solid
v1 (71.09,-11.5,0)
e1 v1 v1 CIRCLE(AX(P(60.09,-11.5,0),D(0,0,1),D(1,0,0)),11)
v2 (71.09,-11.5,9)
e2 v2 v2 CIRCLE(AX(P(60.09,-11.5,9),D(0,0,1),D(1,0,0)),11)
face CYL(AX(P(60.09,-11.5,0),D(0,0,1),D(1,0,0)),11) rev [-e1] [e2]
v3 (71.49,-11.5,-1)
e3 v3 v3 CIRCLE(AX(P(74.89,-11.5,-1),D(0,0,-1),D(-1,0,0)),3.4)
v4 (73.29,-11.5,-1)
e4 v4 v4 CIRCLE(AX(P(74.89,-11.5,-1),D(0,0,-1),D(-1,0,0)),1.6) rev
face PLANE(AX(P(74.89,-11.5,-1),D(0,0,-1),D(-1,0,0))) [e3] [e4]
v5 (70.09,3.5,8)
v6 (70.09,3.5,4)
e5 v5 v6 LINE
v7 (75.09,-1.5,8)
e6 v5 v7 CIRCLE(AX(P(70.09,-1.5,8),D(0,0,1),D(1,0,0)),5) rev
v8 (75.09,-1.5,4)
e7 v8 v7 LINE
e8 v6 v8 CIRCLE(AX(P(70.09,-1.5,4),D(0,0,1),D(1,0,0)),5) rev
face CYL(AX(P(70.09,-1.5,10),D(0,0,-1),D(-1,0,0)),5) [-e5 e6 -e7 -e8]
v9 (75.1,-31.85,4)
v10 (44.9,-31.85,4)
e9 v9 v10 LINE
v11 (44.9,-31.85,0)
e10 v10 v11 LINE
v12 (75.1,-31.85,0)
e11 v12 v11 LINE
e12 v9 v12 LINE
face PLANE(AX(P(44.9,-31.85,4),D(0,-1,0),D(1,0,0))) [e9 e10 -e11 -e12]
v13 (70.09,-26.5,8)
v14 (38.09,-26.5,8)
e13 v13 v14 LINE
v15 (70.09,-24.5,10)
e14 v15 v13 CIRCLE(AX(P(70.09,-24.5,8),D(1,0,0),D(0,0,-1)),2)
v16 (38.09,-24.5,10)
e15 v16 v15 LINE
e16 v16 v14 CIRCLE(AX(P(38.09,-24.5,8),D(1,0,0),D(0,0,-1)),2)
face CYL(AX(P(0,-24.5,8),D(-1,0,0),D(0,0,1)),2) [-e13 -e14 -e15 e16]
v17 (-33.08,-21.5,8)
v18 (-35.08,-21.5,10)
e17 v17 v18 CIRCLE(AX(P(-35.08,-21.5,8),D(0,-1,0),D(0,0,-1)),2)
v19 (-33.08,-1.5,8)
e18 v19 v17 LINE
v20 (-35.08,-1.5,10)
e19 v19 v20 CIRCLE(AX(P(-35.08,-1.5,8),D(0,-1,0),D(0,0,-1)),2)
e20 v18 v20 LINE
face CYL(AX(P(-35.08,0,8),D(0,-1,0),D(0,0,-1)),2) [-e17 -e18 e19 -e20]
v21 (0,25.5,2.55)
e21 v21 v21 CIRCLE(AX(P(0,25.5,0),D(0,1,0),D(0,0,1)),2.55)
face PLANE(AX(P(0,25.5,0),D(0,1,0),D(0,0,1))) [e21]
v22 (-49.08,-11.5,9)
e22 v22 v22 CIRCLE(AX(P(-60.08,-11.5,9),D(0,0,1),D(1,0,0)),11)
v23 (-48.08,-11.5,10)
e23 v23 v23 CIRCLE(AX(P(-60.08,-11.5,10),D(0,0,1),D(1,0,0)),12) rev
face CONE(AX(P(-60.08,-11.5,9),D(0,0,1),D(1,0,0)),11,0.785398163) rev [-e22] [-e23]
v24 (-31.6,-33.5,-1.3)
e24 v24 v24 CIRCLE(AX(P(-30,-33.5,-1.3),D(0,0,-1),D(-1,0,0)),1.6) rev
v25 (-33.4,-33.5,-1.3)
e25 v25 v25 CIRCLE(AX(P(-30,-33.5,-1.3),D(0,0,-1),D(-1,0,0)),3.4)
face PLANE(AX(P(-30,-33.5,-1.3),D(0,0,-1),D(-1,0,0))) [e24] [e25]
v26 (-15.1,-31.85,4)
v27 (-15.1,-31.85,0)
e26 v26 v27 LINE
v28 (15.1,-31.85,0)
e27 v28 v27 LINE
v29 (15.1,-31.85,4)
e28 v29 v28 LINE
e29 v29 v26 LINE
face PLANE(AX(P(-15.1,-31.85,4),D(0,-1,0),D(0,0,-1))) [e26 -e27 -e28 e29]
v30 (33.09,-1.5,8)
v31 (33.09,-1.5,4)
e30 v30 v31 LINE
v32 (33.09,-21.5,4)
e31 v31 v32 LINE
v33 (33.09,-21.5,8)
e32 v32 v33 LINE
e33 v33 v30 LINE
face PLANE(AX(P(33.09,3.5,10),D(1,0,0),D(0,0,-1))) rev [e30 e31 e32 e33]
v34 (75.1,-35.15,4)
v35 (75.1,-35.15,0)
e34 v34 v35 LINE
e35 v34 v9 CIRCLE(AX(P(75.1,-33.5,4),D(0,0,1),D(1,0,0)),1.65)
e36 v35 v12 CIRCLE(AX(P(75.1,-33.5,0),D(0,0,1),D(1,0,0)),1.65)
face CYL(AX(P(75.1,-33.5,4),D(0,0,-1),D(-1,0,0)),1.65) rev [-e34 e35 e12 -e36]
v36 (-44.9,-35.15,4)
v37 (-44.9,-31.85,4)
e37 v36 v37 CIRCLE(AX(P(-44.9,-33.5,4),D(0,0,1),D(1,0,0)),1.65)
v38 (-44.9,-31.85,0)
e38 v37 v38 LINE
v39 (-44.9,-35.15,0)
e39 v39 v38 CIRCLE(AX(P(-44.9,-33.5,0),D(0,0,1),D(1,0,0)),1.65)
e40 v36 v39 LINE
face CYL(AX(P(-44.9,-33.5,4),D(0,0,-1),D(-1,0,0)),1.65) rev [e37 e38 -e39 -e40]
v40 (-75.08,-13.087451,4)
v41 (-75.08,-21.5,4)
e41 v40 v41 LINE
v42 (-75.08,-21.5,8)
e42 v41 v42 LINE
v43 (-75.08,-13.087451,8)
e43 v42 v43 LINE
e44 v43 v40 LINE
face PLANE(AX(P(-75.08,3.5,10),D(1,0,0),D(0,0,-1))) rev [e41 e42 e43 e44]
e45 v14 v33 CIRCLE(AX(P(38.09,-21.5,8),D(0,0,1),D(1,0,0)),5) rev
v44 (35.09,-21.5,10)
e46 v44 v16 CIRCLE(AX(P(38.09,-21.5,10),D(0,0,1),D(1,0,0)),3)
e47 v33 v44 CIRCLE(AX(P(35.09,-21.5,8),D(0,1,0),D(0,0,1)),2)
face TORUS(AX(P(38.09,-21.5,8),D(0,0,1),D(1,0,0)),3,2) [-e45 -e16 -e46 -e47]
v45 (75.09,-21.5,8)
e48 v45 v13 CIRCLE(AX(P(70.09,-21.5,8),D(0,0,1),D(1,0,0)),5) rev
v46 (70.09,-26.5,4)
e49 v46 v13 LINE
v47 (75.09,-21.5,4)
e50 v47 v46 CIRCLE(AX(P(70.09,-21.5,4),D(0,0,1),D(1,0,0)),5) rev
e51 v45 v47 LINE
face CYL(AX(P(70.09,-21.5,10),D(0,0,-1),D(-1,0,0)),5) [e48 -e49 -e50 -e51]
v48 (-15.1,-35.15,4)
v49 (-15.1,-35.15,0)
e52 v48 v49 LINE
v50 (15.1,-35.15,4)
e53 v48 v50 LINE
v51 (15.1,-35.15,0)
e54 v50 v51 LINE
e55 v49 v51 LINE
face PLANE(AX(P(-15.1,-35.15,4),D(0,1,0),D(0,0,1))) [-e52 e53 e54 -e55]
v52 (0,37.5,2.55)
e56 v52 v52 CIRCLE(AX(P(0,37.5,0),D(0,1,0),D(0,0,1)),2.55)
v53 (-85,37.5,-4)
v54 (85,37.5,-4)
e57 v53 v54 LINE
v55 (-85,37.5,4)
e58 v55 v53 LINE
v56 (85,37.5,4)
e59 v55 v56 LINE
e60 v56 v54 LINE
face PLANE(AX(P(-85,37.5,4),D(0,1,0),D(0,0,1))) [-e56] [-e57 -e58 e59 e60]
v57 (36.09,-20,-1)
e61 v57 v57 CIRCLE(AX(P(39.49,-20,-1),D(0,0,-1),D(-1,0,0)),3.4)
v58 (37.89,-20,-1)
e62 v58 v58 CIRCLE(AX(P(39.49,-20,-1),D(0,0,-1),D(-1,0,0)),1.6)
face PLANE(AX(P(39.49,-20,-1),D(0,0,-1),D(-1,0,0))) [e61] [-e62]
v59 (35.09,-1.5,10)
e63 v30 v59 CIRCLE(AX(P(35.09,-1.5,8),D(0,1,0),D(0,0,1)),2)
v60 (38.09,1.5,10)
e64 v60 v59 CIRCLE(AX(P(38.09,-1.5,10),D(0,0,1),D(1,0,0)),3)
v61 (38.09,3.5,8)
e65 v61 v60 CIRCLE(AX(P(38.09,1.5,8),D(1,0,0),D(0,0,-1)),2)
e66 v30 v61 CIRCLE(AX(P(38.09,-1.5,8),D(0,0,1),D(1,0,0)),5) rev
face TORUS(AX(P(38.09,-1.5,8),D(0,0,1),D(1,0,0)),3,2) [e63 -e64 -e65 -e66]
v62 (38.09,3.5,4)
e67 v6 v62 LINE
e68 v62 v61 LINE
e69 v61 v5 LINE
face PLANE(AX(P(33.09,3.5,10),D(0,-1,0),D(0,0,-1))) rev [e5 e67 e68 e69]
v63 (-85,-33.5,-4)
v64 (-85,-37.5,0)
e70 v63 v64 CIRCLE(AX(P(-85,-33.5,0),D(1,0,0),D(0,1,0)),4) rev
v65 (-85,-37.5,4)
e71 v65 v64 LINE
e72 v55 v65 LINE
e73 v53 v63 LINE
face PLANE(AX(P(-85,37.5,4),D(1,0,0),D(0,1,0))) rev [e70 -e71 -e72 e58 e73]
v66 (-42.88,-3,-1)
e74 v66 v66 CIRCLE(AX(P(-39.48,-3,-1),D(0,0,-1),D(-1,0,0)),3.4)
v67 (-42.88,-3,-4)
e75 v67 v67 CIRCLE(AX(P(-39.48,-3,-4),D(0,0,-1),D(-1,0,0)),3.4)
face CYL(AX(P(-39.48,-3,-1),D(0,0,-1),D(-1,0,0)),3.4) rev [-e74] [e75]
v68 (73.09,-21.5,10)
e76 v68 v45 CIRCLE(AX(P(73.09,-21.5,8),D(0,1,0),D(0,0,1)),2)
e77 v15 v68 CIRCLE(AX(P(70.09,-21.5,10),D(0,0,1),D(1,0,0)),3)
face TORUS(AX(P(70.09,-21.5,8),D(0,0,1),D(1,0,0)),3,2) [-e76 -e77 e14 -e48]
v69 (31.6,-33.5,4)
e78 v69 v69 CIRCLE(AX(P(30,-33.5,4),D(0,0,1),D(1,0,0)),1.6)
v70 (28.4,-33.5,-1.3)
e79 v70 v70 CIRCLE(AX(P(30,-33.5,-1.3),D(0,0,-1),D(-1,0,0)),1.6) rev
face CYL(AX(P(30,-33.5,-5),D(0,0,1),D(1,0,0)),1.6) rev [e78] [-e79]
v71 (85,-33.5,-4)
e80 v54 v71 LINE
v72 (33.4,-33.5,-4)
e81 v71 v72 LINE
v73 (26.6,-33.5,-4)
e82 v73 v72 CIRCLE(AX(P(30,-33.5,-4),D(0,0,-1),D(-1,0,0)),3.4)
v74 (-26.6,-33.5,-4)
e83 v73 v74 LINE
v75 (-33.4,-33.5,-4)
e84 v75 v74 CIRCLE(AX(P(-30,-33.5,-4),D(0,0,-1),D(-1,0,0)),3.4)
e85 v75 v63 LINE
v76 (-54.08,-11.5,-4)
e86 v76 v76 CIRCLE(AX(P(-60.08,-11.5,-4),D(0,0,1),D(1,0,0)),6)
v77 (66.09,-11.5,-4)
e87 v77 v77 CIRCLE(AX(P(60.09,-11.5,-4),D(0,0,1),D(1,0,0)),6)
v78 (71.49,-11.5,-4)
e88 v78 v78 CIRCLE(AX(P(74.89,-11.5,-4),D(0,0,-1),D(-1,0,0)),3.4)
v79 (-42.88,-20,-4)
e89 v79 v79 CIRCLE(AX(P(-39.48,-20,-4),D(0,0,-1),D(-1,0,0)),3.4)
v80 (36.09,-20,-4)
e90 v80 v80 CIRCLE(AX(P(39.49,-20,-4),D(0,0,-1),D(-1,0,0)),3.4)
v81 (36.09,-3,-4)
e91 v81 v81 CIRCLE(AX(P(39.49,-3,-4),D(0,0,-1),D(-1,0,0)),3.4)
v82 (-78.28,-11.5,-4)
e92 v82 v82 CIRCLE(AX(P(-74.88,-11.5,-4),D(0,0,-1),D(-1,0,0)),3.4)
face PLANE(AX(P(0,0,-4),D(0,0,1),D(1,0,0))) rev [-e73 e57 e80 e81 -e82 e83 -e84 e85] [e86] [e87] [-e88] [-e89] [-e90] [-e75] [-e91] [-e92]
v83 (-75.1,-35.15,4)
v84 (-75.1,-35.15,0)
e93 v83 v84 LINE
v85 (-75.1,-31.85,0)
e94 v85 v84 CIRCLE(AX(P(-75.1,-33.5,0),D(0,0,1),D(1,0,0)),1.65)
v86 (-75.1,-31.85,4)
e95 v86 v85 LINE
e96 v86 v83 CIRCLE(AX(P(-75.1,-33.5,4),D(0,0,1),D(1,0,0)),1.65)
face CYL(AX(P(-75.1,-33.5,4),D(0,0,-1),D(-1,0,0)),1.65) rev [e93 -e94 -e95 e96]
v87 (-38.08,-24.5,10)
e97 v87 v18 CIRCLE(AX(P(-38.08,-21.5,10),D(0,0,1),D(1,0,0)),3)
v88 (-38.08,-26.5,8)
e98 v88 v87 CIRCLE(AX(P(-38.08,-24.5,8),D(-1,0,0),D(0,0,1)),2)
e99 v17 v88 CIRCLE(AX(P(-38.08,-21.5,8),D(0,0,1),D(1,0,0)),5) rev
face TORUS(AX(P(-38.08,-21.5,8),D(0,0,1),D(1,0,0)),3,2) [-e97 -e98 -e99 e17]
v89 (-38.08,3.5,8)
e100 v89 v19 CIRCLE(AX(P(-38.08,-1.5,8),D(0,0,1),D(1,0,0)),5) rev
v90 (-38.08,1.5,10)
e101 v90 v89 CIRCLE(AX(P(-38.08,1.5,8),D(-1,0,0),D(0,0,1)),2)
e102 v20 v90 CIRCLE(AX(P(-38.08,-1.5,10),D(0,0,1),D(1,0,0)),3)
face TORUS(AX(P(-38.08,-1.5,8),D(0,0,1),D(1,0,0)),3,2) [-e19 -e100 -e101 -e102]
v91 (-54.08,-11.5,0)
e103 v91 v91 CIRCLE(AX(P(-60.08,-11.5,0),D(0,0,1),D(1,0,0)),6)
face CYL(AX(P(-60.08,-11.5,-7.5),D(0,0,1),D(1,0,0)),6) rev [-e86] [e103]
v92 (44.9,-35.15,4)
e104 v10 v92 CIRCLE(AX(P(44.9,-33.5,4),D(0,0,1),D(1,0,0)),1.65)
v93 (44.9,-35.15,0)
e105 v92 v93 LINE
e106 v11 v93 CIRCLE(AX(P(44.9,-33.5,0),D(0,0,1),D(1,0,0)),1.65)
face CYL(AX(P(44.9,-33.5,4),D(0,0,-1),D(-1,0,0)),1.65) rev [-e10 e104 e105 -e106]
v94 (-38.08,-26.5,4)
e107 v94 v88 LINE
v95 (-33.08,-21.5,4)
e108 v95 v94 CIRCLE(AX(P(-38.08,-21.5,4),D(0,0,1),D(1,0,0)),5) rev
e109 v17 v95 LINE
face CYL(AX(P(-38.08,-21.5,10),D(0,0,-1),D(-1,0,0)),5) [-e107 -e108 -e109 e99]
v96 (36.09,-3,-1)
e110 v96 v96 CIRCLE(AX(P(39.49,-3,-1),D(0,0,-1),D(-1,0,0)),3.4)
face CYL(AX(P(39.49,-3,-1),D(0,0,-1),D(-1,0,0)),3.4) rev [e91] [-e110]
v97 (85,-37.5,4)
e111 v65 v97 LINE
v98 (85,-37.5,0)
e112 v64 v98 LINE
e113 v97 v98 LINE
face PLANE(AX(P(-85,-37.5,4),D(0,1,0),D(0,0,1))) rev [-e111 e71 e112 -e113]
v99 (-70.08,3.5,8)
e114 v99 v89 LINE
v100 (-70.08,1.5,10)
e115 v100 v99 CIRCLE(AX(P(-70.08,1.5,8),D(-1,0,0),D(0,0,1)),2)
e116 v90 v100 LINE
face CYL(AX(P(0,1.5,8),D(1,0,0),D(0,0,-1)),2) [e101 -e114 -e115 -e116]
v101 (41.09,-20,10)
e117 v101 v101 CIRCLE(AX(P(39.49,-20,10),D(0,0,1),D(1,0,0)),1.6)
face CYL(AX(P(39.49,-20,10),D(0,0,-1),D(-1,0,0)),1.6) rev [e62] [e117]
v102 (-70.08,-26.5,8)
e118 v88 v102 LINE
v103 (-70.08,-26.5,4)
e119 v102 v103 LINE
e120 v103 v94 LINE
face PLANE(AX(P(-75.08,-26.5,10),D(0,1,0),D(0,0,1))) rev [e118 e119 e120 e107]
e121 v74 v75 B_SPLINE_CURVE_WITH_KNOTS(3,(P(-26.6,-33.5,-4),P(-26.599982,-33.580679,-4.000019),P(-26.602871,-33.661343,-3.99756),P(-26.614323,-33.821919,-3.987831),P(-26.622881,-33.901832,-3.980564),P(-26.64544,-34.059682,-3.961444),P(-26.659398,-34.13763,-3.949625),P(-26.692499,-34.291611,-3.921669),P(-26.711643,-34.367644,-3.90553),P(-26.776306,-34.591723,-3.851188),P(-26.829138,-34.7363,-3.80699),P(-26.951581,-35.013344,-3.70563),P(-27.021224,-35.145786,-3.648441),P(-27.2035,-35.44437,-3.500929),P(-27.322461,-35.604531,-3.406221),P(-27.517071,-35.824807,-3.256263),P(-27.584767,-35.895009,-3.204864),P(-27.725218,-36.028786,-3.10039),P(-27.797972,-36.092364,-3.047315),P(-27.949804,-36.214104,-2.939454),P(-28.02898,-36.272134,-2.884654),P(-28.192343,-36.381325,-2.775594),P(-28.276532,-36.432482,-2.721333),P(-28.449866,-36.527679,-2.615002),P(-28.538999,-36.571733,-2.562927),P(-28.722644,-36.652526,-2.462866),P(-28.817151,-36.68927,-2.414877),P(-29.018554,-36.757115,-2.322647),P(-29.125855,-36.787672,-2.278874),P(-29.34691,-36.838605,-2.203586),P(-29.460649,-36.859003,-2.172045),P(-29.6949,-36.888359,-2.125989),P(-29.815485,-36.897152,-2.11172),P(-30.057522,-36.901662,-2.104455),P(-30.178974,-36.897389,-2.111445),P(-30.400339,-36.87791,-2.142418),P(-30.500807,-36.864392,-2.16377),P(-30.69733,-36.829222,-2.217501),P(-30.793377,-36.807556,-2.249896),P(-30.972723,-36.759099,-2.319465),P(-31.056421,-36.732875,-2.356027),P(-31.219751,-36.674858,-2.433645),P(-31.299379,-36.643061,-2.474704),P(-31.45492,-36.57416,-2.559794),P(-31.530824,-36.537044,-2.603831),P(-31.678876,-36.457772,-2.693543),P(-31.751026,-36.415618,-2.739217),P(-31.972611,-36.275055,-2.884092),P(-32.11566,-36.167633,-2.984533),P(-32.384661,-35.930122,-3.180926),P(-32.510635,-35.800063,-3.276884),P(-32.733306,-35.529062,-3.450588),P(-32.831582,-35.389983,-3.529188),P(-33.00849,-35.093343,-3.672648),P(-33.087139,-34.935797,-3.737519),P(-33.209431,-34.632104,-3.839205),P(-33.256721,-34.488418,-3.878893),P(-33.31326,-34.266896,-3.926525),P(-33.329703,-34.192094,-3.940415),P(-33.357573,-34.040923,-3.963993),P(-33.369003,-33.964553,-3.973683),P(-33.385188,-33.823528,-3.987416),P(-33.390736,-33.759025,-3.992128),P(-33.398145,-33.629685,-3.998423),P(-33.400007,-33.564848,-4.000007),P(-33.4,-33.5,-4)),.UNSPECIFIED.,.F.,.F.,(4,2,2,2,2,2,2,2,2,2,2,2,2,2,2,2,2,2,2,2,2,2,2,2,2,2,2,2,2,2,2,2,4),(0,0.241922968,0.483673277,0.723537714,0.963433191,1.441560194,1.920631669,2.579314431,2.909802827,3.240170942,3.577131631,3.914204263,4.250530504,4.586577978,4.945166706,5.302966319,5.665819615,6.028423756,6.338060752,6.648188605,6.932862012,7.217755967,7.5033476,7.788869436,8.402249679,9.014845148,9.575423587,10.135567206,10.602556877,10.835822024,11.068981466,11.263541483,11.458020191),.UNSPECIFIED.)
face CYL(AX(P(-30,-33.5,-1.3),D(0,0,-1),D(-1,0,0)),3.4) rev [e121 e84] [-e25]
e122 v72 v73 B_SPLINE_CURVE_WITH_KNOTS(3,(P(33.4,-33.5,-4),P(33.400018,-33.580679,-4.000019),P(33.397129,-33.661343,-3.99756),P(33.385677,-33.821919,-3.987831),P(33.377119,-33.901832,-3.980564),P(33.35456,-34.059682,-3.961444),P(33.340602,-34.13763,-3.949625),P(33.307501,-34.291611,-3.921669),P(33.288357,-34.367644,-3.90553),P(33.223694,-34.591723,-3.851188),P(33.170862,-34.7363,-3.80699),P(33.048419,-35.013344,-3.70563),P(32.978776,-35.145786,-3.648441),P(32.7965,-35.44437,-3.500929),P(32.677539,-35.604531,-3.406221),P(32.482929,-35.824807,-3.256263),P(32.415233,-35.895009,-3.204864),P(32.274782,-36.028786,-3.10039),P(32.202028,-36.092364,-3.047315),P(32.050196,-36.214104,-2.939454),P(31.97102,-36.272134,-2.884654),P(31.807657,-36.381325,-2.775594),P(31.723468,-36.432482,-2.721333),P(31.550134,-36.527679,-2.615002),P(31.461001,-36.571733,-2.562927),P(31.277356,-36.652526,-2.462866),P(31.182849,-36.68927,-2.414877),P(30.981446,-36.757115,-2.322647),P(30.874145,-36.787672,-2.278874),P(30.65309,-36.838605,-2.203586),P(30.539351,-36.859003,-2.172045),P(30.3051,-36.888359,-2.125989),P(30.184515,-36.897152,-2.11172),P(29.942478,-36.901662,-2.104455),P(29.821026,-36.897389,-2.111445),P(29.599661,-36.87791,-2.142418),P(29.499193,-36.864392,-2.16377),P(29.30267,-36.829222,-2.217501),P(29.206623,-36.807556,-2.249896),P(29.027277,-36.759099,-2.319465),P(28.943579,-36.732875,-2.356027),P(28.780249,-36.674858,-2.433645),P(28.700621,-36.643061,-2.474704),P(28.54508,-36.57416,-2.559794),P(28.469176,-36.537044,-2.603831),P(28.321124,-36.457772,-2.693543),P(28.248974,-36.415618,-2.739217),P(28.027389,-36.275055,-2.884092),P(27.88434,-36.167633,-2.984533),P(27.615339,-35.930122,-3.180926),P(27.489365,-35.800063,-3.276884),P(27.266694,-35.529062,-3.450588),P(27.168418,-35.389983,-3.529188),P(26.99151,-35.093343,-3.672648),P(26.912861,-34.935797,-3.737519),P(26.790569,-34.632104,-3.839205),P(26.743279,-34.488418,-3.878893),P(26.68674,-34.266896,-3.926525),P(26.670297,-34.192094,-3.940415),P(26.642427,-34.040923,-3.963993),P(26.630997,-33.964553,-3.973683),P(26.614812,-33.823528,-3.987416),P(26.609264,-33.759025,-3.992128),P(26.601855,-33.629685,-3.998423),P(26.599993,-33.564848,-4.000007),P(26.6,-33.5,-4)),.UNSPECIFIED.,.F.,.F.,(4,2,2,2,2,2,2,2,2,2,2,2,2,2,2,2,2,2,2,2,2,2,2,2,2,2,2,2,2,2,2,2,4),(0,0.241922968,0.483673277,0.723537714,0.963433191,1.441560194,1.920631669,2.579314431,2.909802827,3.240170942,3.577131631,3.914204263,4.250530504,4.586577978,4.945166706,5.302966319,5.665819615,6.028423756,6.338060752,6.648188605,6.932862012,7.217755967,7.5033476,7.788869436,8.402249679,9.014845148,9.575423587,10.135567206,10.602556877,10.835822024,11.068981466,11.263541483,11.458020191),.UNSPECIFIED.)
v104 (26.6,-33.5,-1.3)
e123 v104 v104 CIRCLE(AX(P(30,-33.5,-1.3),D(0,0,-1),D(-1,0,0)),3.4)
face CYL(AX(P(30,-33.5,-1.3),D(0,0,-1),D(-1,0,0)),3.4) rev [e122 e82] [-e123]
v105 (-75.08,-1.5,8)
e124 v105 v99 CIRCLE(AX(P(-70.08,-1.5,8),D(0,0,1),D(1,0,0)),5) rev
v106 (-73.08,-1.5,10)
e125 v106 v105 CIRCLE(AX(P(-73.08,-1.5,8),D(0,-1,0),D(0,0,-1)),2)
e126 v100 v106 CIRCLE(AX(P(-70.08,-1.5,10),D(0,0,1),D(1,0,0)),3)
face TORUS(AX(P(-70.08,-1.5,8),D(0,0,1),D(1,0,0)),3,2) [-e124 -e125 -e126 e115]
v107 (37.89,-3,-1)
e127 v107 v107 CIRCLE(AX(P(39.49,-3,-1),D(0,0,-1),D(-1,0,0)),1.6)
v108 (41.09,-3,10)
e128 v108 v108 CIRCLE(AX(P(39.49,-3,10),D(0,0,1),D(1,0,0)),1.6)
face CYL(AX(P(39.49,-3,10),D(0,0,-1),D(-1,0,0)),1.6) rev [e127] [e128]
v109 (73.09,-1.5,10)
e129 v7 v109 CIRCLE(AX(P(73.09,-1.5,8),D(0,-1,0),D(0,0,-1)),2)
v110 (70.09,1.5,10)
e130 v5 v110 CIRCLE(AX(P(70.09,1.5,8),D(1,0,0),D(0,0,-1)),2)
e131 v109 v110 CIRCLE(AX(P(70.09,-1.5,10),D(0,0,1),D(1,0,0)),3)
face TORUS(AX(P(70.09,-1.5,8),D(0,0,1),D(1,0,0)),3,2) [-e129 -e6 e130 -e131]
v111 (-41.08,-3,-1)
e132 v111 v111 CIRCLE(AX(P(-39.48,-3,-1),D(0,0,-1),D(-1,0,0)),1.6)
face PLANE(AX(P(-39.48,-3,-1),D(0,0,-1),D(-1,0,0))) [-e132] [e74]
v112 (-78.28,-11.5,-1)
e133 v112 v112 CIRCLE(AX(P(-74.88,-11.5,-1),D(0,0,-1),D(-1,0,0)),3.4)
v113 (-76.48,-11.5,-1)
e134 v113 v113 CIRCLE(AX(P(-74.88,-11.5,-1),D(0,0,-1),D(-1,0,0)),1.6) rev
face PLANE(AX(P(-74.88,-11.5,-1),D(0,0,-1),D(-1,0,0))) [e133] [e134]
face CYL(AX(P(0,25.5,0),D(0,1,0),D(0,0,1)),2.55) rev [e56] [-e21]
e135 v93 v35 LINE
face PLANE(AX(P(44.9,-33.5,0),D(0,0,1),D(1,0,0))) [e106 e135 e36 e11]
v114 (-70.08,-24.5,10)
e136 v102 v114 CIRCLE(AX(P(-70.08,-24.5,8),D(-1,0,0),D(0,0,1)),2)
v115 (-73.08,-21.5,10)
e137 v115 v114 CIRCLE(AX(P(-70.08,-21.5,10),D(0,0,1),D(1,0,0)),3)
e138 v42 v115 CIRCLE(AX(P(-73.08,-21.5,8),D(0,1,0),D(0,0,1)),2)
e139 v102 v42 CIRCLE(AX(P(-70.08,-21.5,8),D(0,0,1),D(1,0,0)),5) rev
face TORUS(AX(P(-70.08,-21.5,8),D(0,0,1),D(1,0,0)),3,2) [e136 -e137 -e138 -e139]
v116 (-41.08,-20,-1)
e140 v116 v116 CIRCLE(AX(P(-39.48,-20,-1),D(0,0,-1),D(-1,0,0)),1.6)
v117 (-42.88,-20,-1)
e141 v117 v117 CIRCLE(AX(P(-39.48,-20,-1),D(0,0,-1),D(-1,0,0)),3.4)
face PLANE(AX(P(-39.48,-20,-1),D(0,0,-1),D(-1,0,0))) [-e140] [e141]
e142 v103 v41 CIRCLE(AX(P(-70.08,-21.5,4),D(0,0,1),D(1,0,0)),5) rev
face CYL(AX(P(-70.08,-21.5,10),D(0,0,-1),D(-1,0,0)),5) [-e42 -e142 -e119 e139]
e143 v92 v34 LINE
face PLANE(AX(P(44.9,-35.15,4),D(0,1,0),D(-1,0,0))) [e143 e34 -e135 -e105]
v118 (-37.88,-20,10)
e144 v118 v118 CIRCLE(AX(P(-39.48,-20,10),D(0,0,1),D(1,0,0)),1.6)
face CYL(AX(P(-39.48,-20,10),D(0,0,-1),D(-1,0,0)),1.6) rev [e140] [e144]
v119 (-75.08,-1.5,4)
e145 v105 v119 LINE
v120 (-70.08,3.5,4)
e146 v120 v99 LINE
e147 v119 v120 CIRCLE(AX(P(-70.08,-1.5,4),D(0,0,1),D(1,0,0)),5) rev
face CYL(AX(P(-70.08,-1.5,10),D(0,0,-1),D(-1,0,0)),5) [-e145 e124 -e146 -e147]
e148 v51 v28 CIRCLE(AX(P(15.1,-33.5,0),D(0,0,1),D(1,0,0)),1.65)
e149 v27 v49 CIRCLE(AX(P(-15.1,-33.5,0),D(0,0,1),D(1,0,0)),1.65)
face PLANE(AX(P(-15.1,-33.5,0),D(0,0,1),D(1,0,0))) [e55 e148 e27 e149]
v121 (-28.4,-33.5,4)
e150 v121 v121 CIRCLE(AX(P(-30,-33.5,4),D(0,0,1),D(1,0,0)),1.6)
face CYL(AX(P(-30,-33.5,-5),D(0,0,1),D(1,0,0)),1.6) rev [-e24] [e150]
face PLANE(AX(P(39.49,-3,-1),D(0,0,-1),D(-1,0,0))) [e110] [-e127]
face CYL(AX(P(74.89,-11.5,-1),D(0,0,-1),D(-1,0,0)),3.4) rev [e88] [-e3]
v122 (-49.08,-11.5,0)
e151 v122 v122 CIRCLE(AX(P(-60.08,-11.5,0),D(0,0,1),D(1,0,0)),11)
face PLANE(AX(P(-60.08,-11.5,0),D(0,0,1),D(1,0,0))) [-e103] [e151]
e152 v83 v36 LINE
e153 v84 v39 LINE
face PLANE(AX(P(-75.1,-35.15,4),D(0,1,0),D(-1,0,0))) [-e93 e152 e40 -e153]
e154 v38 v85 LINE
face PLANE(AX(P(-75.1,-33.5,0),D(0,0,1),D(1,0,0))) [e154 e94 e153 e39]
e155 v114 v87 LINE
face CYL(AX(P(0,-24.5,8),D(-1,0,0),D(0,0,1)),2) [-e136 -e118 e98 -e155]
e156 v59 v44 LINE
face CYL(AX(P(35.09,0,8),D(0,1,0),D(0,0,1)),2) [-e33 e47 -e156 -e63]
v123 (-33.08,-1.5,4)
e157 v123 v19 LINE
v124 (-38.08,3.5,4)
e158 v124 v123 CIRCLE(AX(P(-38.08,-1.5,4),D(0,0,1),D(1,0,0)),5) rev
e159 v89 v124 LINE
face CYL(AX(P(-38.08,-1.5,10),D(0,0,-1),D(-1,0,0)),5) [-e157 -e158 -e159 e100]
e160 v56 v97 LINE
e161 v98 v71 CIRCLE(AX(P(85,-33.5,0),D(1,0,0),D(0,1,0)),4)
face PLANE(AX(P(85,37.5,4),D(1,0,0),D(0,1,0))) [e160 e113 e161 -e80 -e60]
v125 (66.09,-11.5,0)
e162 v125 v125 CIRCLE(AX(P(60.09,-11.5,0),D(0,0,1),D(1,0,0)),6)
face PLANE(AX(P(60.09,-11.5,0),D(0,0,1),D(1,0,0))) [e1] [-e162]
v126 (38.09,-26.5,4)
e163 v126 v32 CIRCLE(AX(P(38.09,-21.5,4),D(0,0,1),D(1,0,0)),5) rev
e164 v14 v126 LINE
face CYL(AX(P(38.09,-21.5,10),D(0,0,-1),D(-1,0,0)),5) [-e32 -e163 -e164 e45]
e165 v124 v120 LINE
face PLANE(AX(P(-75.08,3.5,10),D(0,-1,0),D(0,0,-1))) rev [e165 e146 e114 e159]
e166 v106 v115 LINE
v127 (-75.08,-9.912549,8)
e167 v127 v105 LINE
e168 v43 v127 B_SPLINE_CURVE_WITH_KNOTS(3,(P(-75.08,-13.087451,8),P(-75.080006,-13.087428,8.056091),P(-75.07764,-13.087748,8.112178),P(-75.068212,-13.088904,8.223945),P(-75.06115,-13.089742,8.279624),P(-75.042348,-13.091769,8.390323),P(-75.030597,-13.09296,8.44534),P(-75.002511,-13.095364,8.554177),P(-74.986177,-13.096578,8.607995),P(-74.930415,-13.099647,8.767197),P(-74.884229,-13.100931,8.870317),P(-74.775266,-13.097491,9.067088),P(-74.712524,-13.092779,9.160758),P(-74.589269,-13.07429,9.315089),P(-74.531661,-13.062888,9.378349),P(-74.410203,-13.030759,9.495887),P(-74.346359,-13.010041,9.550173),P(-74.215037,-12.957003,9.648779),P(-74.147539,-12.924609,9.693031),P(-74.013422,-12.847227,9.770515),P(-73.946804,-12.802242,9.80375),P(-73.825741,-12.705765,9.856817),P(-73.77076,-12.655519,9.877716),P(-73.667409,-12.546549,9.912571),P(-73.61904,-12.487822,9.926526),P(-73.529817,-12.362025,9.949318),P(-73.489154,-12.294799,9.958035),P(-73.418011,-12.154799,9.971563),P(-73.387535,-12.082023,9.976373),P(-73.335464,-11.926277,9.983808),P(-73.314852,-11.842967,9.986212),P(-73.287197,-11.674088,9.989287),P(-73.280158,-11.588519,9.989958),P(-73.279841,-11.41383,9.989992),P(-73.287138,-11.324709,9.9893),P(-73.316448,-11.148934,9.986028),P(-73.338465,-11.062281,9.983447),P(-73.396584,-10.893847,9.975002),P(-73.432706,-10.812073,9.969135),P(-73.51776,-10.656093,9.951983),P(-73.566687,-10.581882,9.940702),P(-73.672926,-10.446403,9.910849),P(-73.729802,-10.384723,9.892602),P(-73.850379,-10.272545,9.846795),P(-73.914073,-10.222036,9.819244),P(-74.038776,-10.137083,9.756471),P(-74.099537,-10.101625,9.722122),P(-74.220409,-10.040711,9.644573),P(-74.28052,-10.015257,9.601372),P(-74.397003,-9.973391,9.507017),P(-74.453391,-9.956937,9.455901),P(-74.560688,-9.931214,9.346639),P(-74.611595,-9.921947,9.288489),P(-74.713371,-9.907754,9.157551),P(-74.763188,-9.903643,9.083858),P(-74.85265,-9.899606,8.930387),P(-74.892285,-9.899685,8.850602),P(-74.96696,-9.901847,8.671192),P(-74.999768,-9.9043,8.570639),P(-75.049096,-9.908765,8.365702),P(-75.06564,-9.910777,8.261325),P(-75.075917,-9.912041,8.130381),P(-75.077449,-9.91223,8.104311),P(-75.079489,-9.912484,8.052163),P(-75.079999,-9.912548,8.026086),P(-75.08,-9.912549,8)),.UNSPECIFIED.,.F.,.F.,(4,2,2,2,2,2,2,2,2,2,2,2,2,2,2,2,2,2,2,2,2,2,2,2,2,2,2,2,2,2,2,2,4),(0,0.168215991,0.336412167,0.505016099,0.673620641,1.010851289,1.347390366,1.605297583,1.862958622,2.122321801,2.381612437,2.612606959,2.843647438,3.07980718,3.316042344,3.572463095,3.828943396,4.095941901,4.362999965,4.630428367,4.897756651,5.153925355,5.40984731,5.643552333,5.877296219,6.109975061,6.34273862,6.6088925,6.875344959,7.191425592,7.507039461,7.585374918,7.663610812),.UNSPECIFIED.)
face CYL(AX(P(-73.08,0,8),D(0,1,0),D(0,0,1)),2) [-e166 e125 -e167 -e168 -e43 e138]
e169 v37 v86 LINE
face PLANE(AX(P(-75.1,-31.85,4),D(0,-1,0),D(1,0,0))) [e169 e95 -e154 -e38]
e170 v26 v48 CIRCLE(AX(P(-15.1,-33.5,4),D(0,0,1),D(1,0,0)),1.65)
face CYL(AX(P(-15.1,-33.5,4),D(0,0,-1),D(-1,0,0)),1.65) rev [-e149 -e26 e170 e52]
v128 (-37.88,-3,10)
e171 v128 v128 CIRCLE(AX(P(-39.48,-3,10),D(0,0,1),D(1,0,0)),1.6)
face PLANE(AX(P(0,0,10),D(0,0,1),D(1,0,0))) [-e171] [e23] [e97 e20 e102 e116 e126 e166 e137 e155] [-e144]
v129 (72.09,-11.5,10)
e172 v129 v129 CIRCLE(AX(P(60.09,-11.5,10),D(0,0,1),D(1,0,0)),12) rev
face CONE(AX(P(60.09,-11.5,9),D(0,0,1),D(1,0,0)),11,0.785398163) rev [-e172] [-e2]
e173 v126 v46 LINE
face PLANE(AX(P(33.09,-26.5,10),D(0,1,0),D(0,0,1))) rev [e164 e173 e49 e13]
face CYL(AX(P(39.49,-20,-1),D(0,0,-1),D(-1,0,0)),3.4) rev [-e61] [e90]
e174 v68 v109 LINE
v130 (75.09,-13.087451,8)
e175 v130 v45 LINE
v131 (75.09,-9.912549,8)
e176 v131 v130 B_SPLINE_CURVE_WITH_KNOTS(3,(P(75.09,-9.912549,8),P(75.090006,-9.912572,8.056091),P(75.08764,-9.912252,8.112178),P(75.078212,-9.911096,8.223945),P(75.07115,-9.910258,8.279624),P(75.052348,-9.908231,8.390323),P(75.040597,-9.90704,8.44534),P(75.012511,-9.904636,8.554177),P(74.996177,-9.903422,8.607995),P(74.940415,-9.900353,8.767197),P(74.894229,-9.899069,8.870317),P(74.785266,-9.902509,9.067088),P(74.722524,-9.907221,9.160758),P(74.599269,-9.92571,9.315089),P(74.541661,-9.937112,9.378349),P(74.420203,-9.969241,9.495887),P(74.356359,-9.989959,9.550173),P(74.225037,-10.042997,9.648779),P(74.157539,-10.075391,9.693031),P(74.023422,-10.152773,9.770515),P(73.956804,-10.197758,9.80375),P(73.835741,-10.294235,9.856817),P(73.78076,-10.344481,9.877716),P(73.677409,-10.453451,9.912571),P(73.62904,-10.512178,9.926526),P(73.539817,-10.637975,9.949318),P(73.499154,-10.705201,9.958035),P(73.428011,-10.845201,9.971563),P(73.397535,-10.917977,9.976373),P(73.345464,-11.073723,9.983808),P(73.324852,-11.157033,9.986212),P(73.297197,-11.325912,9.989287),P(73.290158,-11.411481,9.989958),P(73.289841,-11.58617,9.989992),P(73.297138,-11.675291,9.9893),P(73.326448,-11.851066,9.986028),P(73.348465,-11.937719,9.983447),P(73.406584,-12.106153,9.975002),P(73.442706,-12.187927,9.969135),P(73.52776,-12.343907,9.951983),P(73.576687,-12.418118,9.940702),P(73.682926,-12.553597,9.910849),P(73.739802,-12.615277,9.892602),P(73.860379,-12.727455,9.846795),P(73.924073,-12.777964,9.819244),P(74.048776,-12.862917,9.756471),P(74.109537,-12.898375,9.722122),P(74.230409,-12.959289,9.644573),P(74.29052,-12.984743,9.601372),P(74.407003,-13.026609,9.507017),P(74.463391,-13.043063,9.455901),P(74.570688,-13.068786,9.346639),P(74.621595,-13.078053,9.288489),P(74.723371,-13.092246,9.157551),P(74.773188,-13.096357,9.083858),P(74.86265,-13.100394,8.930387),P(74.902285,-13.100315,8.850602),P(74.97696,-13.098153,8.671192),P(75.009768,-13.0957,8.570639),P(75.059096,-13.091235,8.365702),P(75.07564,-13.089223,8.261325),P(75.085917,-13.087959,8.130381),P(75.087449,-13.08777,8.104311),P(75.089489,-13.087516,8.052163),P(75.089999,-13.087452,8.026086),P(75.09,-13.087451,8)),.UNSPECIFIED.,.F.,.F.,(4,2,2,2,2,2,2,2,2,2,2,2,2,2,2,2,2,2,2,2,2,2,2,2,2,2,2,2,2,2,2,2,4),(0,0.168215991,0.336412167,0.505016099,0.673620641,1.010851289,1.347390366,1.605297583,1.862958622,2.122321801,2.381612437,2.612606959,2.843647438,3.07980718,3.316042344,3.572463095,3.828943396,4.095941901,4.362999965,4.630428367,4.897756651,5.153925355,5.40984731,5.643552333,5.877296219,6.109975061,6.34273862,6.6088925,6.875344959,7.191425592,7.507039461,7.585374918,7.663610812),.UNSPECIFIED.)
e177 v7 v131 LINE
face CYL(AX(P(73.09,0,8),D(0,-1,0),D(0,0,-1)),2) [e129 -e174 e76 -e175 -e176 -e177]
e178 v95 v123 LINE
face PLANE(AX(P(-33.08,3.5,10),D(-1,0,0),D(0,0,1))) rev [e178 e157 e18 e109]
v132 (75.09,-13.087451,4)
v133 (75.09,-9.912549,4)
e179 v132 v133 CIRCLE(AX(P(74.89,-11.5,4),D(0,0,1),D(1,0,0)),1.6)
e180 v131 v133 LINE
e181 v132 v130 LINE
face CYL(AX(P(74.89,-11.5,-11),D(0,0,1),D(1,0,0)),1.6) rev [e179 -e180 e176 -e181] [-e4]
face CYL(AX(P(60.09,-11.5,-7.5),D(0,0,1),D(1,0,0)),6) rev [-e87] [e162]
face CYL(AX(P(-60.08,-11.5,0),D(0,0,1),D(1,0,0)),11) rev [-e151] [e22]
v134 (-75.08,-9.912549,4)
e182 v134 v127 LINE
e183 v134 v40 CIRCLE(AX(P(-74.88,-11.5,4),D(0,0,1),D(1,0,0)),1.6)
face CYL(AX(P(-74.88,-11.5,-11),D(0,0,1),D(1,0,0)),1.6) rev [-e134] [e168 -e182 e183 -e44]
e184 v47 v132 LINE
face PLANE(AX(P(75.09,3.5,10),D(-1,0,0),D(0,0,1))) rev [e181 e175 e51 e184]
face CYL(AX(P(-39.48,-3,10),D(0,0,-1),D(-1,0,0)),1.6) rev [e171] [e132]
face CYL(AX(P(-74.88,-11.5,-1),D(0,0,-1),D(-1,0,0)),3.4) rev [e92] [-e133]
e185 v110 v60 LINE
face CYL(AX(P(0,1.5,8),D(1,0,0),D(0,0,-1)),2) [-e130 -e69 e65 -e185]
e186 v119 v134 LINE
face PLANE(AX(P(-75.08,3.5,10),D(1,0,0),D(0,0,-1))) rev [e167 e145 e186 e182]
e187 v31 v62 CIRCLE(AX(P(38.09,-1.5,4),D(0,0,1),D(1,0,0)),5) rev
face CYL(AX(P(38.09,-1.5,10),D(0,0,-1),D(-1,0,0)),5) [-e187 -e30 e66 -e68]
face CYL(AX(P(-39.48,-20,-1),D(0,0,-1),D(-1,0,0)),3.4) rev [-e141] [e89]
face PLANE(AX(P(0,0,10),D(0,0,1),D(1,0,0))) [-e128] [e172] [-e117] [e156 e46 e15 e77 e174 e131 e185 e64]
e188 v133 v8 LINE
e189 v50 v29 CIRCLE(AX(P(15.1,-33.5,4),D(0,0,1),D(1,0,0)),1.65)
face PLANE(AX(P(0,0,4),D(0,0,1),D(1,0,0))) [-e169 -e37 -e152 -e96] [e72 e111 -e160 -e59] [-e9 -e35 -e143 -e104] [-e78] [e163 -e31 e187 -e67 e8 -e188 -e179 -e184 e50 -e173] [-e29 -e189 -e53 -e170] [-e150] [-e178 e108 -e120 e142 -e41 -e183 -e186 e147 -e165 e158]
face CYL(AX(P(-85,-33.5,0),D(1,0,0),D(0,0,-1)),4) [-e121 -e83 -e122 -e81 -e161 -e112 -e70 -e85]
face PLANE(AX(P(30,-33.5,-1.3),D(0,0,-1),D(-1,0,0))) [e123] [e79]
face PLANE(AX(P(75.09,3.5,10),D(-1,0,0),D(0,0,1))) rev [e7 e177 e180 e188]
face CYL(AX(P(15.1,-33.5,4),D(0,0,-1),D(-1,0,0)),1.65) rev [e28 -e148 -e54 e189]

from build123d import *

# Parameters (mm, degrees)
IZIM1_W                     = 170
IZIM1_H                     = 75
Y_KSEKLIK_EKSTR_ZYON1_DEPTH = 4
KES_EKSTR_ZYON1_DEPTH       = 93.990590922
IZIM3_R                     = 1.6
KES_EKSTR_ZYON2_DEPTH       = 5
IZIM4_R                     = 3.4
KES_EKSTR_ZYON3_DEPTH       = 2.7
RADYUS1_R                   = 4
IZIM5_R                     = 2.55
KES_EKSTR_ZYON4_DEPTH       = 12
IZIM7_R                     = 11
KES_EKSTR_ZYON5_DEPTH       = 4
IZIM6_R                     = 6
KES_EKSTR_ZYON6_DEPTH       = 7.5
Y_KSEKLIK_EKSTR_ZYON2_START = 6
IZIM8_W                     = 42
IZIM8_H                     = 30
IZIM8_R                     = 11
IZIM8_R_2                   = 1.6
Y_KSEKLIK_EKSTR_ZYON2_DEPTH = 6
IZIM9_R                     = 1.6
KES_EKSTR_ZYON7_DEPTH       = 94.248324522
RADYUS2_R                   = 5
IZIM10_R                    = 1.6
KES_EKSTR_ZYON8_DEPTH       = 15
IZIM11_R                    = 3.4
KES_EKSTR_ZYON9_DEPTH       = 3
RADYUS3_R                   = 2
PAH1_SIZE                   = 1


with BuildPart() as part:
    # Çizim1 → Yükseklik-Ekstrüzyon1 (new, symmetric)
    with BuildSketch(Plane.XY):
        Rectangle(IZIM1_W, IZIM1_H)
    extrude(amount=Y_KSEKLIK_EKSTR_ZYON1_DEPTH, both=True)

    # Çizim2 → Kes-Ekstrüzyon1 (cut, through all)
    with BuildSketch(Plane.XY):
        with BuildLine():
            Line((-15.1, -31.85), (15.1, -31.85))
            ThreePointArc((15.1, -31.85), (16.75, -33.5), (15.1, -35.15))
            Line((15.1, -35.15), (-15.1, -35.15))
            ThreePointArc((-15.1, -35.15), (-16.75, -33.5), (-15.1, -31.85))
        make_face()
        with BuildLine():
            Line((-75.1, -31.85), (-44.9, -31.85))
            ThreePointArc((-44.9, -31.85), (-43.25, -33.5), (-44.9, -35.15))
            Line((-44.9, -35.15), (-75.1, -35.15))
            ThreePointArc((-75.1, -35.15), (-76.75, -33.5), (-75.1, -31.85))
        make_face()
        with BuildLine():
            Line((44.9, -31.85), (75.1, -31.85))
            ThreePointArc((75.1, -31.85), (76.75, -33.5), (75.1, -35.15))
            Line((75.1, -35.15), (44.9, -35.15))
            ThreePointArc((44.9, -35.15), (43.25, -33.5), (44.9, -31.85))
        make_face()
    extrude(amount=KES_EKSTR_ZYON1_DEPTH, mode=Mode.SUBTRACT)

    # Çizim3 → Kes-Ekstrüzyon2 (cut, symmetric)
    with BuildSketch(Plane.XY):
        with Locations((30, -33.5)):
            Circle(IZIM3_R)
        with Locations((-30, -33.5)):
            Circle(IZIM3_R)
    extrude(amount=KES_EKSTR_ZYON2_DEPTH, both=True, mode=Mode.SUBTRACT)

    # Çizim4 → Kes-Ekstrüzyon3 (cut)
    with BuildSketch(Plane(origin=(0, 0, -4), x_dir=(-1, 0, 0), z_dir=(0, 0, -1))):
        with Locations((-30, -33.5)):
            Circle(IZIM4_R)
        with Locations((30, -33.5)):
            Circle(IZIM4_R)
    extrude(amount=-KES_EKSTR_ZYON3_DEPTH, mode=Mode.SUBTRACT)

    # Radyus1
    # the kernel refuses this fillet: 4 mm, written as the material it takes off along each edge
    with BuildSketch(Plane(origin=(95, -37.5, -4), x_dir=(0, 1, 0), z_dir=(-1, 0, 0))) as radyus1_piece_1:
        with BuildLine():
            CenterArc((RADYUS1_R, -RADYUS1_R), RADYUS1_R, 90, 90)
            Line((0, -RADYUS1_R), (0, 0))
            Line((0, 0), (RADYUS1_R, 0))
        make_face()
    extrude(amount=190, mode=Mode.SUBTRACT)

    # Çizim5 → Kes-Ekstrüzyon4 (cut)
    with BuildSketch(Plane(origin=(0, 37.5, 0), x_dir=(1, 0, 0), z_dir=(0, 1, 0))):
        with Locations(Location((0, 0, 0), (0, 0, 270))):
            Circle(IZIM5_R)
    extrude(amount=-KES_EKSTR_ZYON4_DEPTH, mode=Mode.SUBTRACT)

    # Çizim7 → Kes-Ekstrüzyon5 (cut)
    with BuildSketch(Plane.XY.offset(4)):
        with Locations((-60.08, -11.5)):
            Circle(IZIM7_R)
        with Locations((60.09, -11.5)):
            Circle(IZIM7_R)
    extrude(amount=-KES_EKSTR_ZYON5_DEPTH, mode=Mode.SUBTRACT)

    # Çizim6 → Kes-Ekstrüzyon6 (cut, symmetric)
    with BuildSketch(Plane.XY):
        with Locations((60.09, -11.5)):
            Circle(IZIM6_R)
        with Locations((-60.08, -11.5)):
            Circle(IZIM6_R)
    extrude(amount=KES_EKSTR_ZYON6_DEPTH, both=True, mode=Mode.SUBTRACT)

    # Çizim8 → Yükseklik-Ekstrüzyon2 (add)
    # profile 1 of 2: a face of its own
    with BuildSketch(Plane.XY.offset(4).offset(Y_KSEKLIK_EKSTR_ZYON2_START)):
        with Locations((-54.08, -11.5)):
            Rectangle(IZIM8_W, IZIM8_H)
        with Locations((-60.08, -11.5)):
            Circle(IZIM8_R, mode=Mode.SUBTRACT)
        with Locations((-39.48, -3)):
            Circle(IZIM8_R_2, mode=Mode.SUBTRACT)
        with Locations((-39.48, -20)):
            Circle(IZIM8_R_2, mode=Mode.SUBTRACT)
    # profile 2 of 2: a face of its own
    with BuildSketch(Plane.XY.offset(4).offset(Y_KSEKLIK_EKSTR_ZYON2_START)):
        with Locations((54.09, -11.5)):
            Rectangle(IZIM8_W, IZIM8_H)
        with Locations((60.09, -11.5)):
            Circle(IZIM8_R, mode=Mode.SUBTRACT)
        with Locations((39.49, -3)):
            Circle(IZIM8_R_2, mode=Mode.SUBTRACT)
        with Locations((39.49, -20)):
            Circle(IZIM8_R_2, mode=Mode.SUBTRACT)
    extrude(amount=-Y_KSEKLIK_EKSTR_ZYON2_DEPTH)

    # Çizim9 → Kes-Ekstrüzyon7 (cut, through all)
    with BuildSketch(Plane.XY.offset(4)):
        with Locations((-39.48, -3)):
            Circle(IZIM9_R)
        with Locations((-39.48, -20)):
            Circle(IZIM9_R)
        with Locations((39.49, -3)):
            Circle(IZIM9_R)
        with Locations((39.49, -20)):
            Circle(IZIM9_R)
    extrude(amount=-KES_EKSTR_ZYON7_DEPTH, mode=Mode.SUBTRACT)

    # Radyus2
    radyus2_edges = [part.edges().sort_by_distance(p)[0] for p in [
        (-75.08, 3.5, 7),
        (-75.08, -26.5, 7),
        (-33.08, -26.5, 7),
        (-33.08, 3.5, 7),
        (33.09, 3.5, 7),
        (33.09, -26.5, 7),
        (75.09, -26.5, 7),
        (75.09, 3.5, 7),
    ]]
    fillet(radyus2_edges, radius=RADYUS2_R)

    # Çizim10 → Kes-Ekstrüzyon8 (cut, symmetric)
    with BuildSketch(Plane.XY.offset(4)):
        with Locations((-74.88, -11.5)):
            Circle(IZIM10_R)
        with Locations((74.89, -11.5)):
            Circle(IZIM10_R)
    extrude(amount=KES_EKSTR_ZYON8_DEPTH, both=True, mode=Mode.SUBTRACT)

    # Çizim11 → Kes-Ekstrüzyon9 (cut)
    with BuildSketch(Plane(origin=(0, 0, -4), x_dir=(-1, 0, 0), z_dir=(0, 0, -1))):
        with Locations((-74.89, -11.5)):
            Circle(IZIM11_R)
        with Locations((-39.49, -3)):
            Circle(IZIM11_R)
        with Locations((-39.49, -20)):
            Circle(IZIM11_R)
        with Locations((39.48, -3)):
            Circle(IZIM11_R)
        with Locations((39.48, -20)):
            Circle(IZIM11_R)
        with Locations((74.88, -11.5)):
            Circle(IZIM11_R)
    extrude(amount=-KES_EKSTR_ZYON9_DEPTH, mode=Mode.SUBTRACT)

    # Radyus3
    # the kernel refuses this fillet: 2 mm, written as the material it takes off along each edge
    with BuildSketch(Plane(origin=(70.09, -1.5, 10), x_dir=(1, 0, 0), z_dir=(0, -1, 0))) as radyus3_piece_1:
        with BuildLine():
            CenterArc((5 - RADYUS3_R, -RADYUS3_R), RADYUS3_R, 0, 90)
            Line((5 - RADYUS3_R, 0), (5, 0))
            Line((5, 0), (5, -RADYUS3_R))
        make_face()
    revolve(axis=Axis((70.09, -1.5, 10), (0, 0, 1)), revolution_arc=90, mode=Mode.SUBTRACT)
    with BuildSketch(Plane(origin=(75.09, -8.087450787, 10), x_dir=(0, 0, -1), z_dir=(0, -1, 0)), Plane(origin=(-75.08, -14.912549213, 10), x_dir=(0, 0, -1), z_dir=(0, 1, 0)), Plane(origin=(-75.08, -21.5, 10), x_dir=(0, 0, -1), z_dir=(0, 1, 0)), Plane(origin=(75.09, -1.5, 10), x_dir=(0, 0, -1), z_dir=(0, -1, 0))) as radyus3_piece_2:
        with BuildLine():
            CenterArc((RADYUS3_R, -RADYUS3_R), RADYUS3_R, 90, 90)
            Line((0, -RADYUS3_R), (0, 0))
            Line((0, 0), (RADYUS3_R, 0))
        make_face()
    extrude(amount=13.412549213, mode=Mode.SUBTRACT)
    with BuildSketch(Plane(origin=(70.09, -21.5, 10), x_dir=(0, -1, 0), z_dir=(-1, 0, 0))) as radyus3_piece_3:
        with BuildLine():
            CenterArc((5 - RADYUS3_R, -RADYUS3_R), RADYUS3_R, 0, 90)
            Line((5 - RADYUS3_R, 0), (5, 0))
            Line((5, 0), (5, -RADYUS3_R))
        make_face()
    revolve(axis=Axis((70.09, -21.5, 10), (0, 0, 1)), revolution_arc=90, mode=Mode.SUBTRACT)
    with BuildSketch(Plane(origin=(70.09, -26.5, 10), x_dir=(0, 0, -1), z_dir=(-1, 0, 0)), Plane(origin=(-38.08, -26.5, 10), x_dir=(0, 0, -1), z_dir=(-1, 0, 0)), Plane(origin=(38.09, 3.5, 10), x_dir=(0, 0, -1), z_dir=(1, 0, 0)), Plane(origin=(-70.08, 3.5, 10), x_dir=(0, 0, -1), z_dir=(1, 0, 0))) as radyus3_piece_4:
        with BuildLine():
            CenterArc((RADYUS3_R, -RADYUS3_R), RADYUS3_R, 90, 90)
            Line((0, -RADYUS3_R), (0, 0))
            Line((0, 0), (RADYUS3_R, 0))
        make_face()
    extrude(amount=32, mode=Mode.SUBTRACT)
    with BuildSketch(Plane(origin=(38.09, -21.5, 10), x_dir=(-1, 0, 0), z_dir=(0, 1, 0))) as radyus3_piece_5:
        with BuildLine():
            CenterArc((5 - RADYUS3_R, -RADYUS3_R), RADYUS3_R, 0, 90)
            Line((5 - RADYUS3_R, 0), (5, 0))
            Line((5, 0), (5, -RADYUS3_R))
        make_face()
    revolve(axis=Axis((38.09, -21.5, 10), (0, 0, 1)), revolution_arc=90, mode=Mode.SUBTRACT)
    with BuildSketch(Plane(origin=(33.09, -21.5, 10), x_dir=(0, 0, -1), z_dir=(0, 1, 0)), Plane(origin=(-33.08, -1.5, 10), x_dir=(0, 0, -1), z_dir=(0, -1, 0))) as radyus3_piece_6:
        with BuildLine():
            CenterArc((RADYUS3_R, -RADYUS3_R), RADYUS3_R, 90, 90)
            Line((0, -RADYUS3_R), (0, 0))
            Line((0, 0), (RADYUS3_R, 0))
        make_face()
    extrude(amount=20, mode=Mode.SUBTRACT)
    with BuildSketch(Plane(origin=(38.09, -1.5, 10), x_dir=(-1, 0, 0), z_dir=(0, -1, 0))) as radyus3_piece_7:
        with BuildLine():
            CenterArc((5 - RADYUS3_R, RADYUS3_R), RADYUS3_R, 270, 90)
            Line((5 - RADYUS3_R, 0), (5, 0))
            Line((5, 0), (5, RADYUS3_R))
        make_face()
    revolve(axis=Axis((38.09, -1.5, 10), (0, 0, -1)), revolution_arc=90, mode=Mode.SUBTRACT)
    with BuildSketch(Plane(origin=(-70.08, -21.5, 10), x_dir=(-1, 0, 0), z_dir=(0, 1, 0))) as radyus3_piece_8:
        with BuildLine():
            CenterArc((5 - RADYUS3_R, -RADYUS3_R), RADYUS3_R, 0, 90)
            Line((5 - RADYUS3_R, 0), (5, 0))
            Line((5, 0), (5, -RADYUS3_R))
        make_face()
    revolve(axis=Axis((-70.08, -21.5, 10), (0, 0, 1)), revolution_arc=90, mode=Mode.SUBTRACT)
    with BuildSketch(Plane(origin=(-38.08, -21.5, 10), x_dir=(0, -1, 0), z_dir=(-1, 0, 0))) as radyus3_piece_9:
        with BuildLine():
            CenterArc((5 - RADYUS3_R, -RADYUS3_R), RADYUS3_R, 0, 90)
            Line((5 - RADYUS3_R, 0), (5, 0))
            Line((5, 0), (5, -RADYUS3_R))
        make_face()
    revolve(axis=Axis((-38.08, -21.5, 10), (0, 0, 1)), revolution_arc=90, mode=Mode.SUBTRACT)
    with BuildSketch(Plane(origin=(-38.08, -1.5, 10), x_dir=(1, 0, 0), z_dir=(0, -1, 0))) as radyus3_piece_10:
        with BuildLine():
            CenterArc((5 - RADYUS3_R, -RADYUS3_R), RADYUS3_R, 0, 90)
            Line((5 - RADYUS3_R, 0), (5, 0))
            Line((5, 0), (5, -RADYUS3_R))
        make_face()
    revolve(axis=Axis((-38.08, -1.5, 10), (0, 0, 1)), revolution_arc=90, mode=Mode.SUBTRACT)
    with BuildSketch(Plane(origin=(-70.08, -1.5, 10), x_dir=(-1, 0, 0), z_dir=(0, -1, 0))) as radyus3_piece_11:
        with BuildLine():
            CenterArc((5 - RADYUS3_R, RADYUS3_R), RADYUS3_R, 270, 90)
            Line((5 - RADYUS3_R, 0), (5, 0))
            Line((5, 0), (5, RADYUS3_R))
        make_face()
    revolve(axis=Axis((-70.08, -1.5, 10), (0, 0, -1)), revolution_arc=90, mode=Mode.SUBTRACT)

    # Pah1
    pah1_edges = [part.edges().sort_by_distance(p)[0] for p in [
        (-71.08, -11.5, 10),
        (49.09, -11.5, 10),
    ]]
    chamfer(pah1_edges, length=PAH1_SIZE)


solid = part.part
